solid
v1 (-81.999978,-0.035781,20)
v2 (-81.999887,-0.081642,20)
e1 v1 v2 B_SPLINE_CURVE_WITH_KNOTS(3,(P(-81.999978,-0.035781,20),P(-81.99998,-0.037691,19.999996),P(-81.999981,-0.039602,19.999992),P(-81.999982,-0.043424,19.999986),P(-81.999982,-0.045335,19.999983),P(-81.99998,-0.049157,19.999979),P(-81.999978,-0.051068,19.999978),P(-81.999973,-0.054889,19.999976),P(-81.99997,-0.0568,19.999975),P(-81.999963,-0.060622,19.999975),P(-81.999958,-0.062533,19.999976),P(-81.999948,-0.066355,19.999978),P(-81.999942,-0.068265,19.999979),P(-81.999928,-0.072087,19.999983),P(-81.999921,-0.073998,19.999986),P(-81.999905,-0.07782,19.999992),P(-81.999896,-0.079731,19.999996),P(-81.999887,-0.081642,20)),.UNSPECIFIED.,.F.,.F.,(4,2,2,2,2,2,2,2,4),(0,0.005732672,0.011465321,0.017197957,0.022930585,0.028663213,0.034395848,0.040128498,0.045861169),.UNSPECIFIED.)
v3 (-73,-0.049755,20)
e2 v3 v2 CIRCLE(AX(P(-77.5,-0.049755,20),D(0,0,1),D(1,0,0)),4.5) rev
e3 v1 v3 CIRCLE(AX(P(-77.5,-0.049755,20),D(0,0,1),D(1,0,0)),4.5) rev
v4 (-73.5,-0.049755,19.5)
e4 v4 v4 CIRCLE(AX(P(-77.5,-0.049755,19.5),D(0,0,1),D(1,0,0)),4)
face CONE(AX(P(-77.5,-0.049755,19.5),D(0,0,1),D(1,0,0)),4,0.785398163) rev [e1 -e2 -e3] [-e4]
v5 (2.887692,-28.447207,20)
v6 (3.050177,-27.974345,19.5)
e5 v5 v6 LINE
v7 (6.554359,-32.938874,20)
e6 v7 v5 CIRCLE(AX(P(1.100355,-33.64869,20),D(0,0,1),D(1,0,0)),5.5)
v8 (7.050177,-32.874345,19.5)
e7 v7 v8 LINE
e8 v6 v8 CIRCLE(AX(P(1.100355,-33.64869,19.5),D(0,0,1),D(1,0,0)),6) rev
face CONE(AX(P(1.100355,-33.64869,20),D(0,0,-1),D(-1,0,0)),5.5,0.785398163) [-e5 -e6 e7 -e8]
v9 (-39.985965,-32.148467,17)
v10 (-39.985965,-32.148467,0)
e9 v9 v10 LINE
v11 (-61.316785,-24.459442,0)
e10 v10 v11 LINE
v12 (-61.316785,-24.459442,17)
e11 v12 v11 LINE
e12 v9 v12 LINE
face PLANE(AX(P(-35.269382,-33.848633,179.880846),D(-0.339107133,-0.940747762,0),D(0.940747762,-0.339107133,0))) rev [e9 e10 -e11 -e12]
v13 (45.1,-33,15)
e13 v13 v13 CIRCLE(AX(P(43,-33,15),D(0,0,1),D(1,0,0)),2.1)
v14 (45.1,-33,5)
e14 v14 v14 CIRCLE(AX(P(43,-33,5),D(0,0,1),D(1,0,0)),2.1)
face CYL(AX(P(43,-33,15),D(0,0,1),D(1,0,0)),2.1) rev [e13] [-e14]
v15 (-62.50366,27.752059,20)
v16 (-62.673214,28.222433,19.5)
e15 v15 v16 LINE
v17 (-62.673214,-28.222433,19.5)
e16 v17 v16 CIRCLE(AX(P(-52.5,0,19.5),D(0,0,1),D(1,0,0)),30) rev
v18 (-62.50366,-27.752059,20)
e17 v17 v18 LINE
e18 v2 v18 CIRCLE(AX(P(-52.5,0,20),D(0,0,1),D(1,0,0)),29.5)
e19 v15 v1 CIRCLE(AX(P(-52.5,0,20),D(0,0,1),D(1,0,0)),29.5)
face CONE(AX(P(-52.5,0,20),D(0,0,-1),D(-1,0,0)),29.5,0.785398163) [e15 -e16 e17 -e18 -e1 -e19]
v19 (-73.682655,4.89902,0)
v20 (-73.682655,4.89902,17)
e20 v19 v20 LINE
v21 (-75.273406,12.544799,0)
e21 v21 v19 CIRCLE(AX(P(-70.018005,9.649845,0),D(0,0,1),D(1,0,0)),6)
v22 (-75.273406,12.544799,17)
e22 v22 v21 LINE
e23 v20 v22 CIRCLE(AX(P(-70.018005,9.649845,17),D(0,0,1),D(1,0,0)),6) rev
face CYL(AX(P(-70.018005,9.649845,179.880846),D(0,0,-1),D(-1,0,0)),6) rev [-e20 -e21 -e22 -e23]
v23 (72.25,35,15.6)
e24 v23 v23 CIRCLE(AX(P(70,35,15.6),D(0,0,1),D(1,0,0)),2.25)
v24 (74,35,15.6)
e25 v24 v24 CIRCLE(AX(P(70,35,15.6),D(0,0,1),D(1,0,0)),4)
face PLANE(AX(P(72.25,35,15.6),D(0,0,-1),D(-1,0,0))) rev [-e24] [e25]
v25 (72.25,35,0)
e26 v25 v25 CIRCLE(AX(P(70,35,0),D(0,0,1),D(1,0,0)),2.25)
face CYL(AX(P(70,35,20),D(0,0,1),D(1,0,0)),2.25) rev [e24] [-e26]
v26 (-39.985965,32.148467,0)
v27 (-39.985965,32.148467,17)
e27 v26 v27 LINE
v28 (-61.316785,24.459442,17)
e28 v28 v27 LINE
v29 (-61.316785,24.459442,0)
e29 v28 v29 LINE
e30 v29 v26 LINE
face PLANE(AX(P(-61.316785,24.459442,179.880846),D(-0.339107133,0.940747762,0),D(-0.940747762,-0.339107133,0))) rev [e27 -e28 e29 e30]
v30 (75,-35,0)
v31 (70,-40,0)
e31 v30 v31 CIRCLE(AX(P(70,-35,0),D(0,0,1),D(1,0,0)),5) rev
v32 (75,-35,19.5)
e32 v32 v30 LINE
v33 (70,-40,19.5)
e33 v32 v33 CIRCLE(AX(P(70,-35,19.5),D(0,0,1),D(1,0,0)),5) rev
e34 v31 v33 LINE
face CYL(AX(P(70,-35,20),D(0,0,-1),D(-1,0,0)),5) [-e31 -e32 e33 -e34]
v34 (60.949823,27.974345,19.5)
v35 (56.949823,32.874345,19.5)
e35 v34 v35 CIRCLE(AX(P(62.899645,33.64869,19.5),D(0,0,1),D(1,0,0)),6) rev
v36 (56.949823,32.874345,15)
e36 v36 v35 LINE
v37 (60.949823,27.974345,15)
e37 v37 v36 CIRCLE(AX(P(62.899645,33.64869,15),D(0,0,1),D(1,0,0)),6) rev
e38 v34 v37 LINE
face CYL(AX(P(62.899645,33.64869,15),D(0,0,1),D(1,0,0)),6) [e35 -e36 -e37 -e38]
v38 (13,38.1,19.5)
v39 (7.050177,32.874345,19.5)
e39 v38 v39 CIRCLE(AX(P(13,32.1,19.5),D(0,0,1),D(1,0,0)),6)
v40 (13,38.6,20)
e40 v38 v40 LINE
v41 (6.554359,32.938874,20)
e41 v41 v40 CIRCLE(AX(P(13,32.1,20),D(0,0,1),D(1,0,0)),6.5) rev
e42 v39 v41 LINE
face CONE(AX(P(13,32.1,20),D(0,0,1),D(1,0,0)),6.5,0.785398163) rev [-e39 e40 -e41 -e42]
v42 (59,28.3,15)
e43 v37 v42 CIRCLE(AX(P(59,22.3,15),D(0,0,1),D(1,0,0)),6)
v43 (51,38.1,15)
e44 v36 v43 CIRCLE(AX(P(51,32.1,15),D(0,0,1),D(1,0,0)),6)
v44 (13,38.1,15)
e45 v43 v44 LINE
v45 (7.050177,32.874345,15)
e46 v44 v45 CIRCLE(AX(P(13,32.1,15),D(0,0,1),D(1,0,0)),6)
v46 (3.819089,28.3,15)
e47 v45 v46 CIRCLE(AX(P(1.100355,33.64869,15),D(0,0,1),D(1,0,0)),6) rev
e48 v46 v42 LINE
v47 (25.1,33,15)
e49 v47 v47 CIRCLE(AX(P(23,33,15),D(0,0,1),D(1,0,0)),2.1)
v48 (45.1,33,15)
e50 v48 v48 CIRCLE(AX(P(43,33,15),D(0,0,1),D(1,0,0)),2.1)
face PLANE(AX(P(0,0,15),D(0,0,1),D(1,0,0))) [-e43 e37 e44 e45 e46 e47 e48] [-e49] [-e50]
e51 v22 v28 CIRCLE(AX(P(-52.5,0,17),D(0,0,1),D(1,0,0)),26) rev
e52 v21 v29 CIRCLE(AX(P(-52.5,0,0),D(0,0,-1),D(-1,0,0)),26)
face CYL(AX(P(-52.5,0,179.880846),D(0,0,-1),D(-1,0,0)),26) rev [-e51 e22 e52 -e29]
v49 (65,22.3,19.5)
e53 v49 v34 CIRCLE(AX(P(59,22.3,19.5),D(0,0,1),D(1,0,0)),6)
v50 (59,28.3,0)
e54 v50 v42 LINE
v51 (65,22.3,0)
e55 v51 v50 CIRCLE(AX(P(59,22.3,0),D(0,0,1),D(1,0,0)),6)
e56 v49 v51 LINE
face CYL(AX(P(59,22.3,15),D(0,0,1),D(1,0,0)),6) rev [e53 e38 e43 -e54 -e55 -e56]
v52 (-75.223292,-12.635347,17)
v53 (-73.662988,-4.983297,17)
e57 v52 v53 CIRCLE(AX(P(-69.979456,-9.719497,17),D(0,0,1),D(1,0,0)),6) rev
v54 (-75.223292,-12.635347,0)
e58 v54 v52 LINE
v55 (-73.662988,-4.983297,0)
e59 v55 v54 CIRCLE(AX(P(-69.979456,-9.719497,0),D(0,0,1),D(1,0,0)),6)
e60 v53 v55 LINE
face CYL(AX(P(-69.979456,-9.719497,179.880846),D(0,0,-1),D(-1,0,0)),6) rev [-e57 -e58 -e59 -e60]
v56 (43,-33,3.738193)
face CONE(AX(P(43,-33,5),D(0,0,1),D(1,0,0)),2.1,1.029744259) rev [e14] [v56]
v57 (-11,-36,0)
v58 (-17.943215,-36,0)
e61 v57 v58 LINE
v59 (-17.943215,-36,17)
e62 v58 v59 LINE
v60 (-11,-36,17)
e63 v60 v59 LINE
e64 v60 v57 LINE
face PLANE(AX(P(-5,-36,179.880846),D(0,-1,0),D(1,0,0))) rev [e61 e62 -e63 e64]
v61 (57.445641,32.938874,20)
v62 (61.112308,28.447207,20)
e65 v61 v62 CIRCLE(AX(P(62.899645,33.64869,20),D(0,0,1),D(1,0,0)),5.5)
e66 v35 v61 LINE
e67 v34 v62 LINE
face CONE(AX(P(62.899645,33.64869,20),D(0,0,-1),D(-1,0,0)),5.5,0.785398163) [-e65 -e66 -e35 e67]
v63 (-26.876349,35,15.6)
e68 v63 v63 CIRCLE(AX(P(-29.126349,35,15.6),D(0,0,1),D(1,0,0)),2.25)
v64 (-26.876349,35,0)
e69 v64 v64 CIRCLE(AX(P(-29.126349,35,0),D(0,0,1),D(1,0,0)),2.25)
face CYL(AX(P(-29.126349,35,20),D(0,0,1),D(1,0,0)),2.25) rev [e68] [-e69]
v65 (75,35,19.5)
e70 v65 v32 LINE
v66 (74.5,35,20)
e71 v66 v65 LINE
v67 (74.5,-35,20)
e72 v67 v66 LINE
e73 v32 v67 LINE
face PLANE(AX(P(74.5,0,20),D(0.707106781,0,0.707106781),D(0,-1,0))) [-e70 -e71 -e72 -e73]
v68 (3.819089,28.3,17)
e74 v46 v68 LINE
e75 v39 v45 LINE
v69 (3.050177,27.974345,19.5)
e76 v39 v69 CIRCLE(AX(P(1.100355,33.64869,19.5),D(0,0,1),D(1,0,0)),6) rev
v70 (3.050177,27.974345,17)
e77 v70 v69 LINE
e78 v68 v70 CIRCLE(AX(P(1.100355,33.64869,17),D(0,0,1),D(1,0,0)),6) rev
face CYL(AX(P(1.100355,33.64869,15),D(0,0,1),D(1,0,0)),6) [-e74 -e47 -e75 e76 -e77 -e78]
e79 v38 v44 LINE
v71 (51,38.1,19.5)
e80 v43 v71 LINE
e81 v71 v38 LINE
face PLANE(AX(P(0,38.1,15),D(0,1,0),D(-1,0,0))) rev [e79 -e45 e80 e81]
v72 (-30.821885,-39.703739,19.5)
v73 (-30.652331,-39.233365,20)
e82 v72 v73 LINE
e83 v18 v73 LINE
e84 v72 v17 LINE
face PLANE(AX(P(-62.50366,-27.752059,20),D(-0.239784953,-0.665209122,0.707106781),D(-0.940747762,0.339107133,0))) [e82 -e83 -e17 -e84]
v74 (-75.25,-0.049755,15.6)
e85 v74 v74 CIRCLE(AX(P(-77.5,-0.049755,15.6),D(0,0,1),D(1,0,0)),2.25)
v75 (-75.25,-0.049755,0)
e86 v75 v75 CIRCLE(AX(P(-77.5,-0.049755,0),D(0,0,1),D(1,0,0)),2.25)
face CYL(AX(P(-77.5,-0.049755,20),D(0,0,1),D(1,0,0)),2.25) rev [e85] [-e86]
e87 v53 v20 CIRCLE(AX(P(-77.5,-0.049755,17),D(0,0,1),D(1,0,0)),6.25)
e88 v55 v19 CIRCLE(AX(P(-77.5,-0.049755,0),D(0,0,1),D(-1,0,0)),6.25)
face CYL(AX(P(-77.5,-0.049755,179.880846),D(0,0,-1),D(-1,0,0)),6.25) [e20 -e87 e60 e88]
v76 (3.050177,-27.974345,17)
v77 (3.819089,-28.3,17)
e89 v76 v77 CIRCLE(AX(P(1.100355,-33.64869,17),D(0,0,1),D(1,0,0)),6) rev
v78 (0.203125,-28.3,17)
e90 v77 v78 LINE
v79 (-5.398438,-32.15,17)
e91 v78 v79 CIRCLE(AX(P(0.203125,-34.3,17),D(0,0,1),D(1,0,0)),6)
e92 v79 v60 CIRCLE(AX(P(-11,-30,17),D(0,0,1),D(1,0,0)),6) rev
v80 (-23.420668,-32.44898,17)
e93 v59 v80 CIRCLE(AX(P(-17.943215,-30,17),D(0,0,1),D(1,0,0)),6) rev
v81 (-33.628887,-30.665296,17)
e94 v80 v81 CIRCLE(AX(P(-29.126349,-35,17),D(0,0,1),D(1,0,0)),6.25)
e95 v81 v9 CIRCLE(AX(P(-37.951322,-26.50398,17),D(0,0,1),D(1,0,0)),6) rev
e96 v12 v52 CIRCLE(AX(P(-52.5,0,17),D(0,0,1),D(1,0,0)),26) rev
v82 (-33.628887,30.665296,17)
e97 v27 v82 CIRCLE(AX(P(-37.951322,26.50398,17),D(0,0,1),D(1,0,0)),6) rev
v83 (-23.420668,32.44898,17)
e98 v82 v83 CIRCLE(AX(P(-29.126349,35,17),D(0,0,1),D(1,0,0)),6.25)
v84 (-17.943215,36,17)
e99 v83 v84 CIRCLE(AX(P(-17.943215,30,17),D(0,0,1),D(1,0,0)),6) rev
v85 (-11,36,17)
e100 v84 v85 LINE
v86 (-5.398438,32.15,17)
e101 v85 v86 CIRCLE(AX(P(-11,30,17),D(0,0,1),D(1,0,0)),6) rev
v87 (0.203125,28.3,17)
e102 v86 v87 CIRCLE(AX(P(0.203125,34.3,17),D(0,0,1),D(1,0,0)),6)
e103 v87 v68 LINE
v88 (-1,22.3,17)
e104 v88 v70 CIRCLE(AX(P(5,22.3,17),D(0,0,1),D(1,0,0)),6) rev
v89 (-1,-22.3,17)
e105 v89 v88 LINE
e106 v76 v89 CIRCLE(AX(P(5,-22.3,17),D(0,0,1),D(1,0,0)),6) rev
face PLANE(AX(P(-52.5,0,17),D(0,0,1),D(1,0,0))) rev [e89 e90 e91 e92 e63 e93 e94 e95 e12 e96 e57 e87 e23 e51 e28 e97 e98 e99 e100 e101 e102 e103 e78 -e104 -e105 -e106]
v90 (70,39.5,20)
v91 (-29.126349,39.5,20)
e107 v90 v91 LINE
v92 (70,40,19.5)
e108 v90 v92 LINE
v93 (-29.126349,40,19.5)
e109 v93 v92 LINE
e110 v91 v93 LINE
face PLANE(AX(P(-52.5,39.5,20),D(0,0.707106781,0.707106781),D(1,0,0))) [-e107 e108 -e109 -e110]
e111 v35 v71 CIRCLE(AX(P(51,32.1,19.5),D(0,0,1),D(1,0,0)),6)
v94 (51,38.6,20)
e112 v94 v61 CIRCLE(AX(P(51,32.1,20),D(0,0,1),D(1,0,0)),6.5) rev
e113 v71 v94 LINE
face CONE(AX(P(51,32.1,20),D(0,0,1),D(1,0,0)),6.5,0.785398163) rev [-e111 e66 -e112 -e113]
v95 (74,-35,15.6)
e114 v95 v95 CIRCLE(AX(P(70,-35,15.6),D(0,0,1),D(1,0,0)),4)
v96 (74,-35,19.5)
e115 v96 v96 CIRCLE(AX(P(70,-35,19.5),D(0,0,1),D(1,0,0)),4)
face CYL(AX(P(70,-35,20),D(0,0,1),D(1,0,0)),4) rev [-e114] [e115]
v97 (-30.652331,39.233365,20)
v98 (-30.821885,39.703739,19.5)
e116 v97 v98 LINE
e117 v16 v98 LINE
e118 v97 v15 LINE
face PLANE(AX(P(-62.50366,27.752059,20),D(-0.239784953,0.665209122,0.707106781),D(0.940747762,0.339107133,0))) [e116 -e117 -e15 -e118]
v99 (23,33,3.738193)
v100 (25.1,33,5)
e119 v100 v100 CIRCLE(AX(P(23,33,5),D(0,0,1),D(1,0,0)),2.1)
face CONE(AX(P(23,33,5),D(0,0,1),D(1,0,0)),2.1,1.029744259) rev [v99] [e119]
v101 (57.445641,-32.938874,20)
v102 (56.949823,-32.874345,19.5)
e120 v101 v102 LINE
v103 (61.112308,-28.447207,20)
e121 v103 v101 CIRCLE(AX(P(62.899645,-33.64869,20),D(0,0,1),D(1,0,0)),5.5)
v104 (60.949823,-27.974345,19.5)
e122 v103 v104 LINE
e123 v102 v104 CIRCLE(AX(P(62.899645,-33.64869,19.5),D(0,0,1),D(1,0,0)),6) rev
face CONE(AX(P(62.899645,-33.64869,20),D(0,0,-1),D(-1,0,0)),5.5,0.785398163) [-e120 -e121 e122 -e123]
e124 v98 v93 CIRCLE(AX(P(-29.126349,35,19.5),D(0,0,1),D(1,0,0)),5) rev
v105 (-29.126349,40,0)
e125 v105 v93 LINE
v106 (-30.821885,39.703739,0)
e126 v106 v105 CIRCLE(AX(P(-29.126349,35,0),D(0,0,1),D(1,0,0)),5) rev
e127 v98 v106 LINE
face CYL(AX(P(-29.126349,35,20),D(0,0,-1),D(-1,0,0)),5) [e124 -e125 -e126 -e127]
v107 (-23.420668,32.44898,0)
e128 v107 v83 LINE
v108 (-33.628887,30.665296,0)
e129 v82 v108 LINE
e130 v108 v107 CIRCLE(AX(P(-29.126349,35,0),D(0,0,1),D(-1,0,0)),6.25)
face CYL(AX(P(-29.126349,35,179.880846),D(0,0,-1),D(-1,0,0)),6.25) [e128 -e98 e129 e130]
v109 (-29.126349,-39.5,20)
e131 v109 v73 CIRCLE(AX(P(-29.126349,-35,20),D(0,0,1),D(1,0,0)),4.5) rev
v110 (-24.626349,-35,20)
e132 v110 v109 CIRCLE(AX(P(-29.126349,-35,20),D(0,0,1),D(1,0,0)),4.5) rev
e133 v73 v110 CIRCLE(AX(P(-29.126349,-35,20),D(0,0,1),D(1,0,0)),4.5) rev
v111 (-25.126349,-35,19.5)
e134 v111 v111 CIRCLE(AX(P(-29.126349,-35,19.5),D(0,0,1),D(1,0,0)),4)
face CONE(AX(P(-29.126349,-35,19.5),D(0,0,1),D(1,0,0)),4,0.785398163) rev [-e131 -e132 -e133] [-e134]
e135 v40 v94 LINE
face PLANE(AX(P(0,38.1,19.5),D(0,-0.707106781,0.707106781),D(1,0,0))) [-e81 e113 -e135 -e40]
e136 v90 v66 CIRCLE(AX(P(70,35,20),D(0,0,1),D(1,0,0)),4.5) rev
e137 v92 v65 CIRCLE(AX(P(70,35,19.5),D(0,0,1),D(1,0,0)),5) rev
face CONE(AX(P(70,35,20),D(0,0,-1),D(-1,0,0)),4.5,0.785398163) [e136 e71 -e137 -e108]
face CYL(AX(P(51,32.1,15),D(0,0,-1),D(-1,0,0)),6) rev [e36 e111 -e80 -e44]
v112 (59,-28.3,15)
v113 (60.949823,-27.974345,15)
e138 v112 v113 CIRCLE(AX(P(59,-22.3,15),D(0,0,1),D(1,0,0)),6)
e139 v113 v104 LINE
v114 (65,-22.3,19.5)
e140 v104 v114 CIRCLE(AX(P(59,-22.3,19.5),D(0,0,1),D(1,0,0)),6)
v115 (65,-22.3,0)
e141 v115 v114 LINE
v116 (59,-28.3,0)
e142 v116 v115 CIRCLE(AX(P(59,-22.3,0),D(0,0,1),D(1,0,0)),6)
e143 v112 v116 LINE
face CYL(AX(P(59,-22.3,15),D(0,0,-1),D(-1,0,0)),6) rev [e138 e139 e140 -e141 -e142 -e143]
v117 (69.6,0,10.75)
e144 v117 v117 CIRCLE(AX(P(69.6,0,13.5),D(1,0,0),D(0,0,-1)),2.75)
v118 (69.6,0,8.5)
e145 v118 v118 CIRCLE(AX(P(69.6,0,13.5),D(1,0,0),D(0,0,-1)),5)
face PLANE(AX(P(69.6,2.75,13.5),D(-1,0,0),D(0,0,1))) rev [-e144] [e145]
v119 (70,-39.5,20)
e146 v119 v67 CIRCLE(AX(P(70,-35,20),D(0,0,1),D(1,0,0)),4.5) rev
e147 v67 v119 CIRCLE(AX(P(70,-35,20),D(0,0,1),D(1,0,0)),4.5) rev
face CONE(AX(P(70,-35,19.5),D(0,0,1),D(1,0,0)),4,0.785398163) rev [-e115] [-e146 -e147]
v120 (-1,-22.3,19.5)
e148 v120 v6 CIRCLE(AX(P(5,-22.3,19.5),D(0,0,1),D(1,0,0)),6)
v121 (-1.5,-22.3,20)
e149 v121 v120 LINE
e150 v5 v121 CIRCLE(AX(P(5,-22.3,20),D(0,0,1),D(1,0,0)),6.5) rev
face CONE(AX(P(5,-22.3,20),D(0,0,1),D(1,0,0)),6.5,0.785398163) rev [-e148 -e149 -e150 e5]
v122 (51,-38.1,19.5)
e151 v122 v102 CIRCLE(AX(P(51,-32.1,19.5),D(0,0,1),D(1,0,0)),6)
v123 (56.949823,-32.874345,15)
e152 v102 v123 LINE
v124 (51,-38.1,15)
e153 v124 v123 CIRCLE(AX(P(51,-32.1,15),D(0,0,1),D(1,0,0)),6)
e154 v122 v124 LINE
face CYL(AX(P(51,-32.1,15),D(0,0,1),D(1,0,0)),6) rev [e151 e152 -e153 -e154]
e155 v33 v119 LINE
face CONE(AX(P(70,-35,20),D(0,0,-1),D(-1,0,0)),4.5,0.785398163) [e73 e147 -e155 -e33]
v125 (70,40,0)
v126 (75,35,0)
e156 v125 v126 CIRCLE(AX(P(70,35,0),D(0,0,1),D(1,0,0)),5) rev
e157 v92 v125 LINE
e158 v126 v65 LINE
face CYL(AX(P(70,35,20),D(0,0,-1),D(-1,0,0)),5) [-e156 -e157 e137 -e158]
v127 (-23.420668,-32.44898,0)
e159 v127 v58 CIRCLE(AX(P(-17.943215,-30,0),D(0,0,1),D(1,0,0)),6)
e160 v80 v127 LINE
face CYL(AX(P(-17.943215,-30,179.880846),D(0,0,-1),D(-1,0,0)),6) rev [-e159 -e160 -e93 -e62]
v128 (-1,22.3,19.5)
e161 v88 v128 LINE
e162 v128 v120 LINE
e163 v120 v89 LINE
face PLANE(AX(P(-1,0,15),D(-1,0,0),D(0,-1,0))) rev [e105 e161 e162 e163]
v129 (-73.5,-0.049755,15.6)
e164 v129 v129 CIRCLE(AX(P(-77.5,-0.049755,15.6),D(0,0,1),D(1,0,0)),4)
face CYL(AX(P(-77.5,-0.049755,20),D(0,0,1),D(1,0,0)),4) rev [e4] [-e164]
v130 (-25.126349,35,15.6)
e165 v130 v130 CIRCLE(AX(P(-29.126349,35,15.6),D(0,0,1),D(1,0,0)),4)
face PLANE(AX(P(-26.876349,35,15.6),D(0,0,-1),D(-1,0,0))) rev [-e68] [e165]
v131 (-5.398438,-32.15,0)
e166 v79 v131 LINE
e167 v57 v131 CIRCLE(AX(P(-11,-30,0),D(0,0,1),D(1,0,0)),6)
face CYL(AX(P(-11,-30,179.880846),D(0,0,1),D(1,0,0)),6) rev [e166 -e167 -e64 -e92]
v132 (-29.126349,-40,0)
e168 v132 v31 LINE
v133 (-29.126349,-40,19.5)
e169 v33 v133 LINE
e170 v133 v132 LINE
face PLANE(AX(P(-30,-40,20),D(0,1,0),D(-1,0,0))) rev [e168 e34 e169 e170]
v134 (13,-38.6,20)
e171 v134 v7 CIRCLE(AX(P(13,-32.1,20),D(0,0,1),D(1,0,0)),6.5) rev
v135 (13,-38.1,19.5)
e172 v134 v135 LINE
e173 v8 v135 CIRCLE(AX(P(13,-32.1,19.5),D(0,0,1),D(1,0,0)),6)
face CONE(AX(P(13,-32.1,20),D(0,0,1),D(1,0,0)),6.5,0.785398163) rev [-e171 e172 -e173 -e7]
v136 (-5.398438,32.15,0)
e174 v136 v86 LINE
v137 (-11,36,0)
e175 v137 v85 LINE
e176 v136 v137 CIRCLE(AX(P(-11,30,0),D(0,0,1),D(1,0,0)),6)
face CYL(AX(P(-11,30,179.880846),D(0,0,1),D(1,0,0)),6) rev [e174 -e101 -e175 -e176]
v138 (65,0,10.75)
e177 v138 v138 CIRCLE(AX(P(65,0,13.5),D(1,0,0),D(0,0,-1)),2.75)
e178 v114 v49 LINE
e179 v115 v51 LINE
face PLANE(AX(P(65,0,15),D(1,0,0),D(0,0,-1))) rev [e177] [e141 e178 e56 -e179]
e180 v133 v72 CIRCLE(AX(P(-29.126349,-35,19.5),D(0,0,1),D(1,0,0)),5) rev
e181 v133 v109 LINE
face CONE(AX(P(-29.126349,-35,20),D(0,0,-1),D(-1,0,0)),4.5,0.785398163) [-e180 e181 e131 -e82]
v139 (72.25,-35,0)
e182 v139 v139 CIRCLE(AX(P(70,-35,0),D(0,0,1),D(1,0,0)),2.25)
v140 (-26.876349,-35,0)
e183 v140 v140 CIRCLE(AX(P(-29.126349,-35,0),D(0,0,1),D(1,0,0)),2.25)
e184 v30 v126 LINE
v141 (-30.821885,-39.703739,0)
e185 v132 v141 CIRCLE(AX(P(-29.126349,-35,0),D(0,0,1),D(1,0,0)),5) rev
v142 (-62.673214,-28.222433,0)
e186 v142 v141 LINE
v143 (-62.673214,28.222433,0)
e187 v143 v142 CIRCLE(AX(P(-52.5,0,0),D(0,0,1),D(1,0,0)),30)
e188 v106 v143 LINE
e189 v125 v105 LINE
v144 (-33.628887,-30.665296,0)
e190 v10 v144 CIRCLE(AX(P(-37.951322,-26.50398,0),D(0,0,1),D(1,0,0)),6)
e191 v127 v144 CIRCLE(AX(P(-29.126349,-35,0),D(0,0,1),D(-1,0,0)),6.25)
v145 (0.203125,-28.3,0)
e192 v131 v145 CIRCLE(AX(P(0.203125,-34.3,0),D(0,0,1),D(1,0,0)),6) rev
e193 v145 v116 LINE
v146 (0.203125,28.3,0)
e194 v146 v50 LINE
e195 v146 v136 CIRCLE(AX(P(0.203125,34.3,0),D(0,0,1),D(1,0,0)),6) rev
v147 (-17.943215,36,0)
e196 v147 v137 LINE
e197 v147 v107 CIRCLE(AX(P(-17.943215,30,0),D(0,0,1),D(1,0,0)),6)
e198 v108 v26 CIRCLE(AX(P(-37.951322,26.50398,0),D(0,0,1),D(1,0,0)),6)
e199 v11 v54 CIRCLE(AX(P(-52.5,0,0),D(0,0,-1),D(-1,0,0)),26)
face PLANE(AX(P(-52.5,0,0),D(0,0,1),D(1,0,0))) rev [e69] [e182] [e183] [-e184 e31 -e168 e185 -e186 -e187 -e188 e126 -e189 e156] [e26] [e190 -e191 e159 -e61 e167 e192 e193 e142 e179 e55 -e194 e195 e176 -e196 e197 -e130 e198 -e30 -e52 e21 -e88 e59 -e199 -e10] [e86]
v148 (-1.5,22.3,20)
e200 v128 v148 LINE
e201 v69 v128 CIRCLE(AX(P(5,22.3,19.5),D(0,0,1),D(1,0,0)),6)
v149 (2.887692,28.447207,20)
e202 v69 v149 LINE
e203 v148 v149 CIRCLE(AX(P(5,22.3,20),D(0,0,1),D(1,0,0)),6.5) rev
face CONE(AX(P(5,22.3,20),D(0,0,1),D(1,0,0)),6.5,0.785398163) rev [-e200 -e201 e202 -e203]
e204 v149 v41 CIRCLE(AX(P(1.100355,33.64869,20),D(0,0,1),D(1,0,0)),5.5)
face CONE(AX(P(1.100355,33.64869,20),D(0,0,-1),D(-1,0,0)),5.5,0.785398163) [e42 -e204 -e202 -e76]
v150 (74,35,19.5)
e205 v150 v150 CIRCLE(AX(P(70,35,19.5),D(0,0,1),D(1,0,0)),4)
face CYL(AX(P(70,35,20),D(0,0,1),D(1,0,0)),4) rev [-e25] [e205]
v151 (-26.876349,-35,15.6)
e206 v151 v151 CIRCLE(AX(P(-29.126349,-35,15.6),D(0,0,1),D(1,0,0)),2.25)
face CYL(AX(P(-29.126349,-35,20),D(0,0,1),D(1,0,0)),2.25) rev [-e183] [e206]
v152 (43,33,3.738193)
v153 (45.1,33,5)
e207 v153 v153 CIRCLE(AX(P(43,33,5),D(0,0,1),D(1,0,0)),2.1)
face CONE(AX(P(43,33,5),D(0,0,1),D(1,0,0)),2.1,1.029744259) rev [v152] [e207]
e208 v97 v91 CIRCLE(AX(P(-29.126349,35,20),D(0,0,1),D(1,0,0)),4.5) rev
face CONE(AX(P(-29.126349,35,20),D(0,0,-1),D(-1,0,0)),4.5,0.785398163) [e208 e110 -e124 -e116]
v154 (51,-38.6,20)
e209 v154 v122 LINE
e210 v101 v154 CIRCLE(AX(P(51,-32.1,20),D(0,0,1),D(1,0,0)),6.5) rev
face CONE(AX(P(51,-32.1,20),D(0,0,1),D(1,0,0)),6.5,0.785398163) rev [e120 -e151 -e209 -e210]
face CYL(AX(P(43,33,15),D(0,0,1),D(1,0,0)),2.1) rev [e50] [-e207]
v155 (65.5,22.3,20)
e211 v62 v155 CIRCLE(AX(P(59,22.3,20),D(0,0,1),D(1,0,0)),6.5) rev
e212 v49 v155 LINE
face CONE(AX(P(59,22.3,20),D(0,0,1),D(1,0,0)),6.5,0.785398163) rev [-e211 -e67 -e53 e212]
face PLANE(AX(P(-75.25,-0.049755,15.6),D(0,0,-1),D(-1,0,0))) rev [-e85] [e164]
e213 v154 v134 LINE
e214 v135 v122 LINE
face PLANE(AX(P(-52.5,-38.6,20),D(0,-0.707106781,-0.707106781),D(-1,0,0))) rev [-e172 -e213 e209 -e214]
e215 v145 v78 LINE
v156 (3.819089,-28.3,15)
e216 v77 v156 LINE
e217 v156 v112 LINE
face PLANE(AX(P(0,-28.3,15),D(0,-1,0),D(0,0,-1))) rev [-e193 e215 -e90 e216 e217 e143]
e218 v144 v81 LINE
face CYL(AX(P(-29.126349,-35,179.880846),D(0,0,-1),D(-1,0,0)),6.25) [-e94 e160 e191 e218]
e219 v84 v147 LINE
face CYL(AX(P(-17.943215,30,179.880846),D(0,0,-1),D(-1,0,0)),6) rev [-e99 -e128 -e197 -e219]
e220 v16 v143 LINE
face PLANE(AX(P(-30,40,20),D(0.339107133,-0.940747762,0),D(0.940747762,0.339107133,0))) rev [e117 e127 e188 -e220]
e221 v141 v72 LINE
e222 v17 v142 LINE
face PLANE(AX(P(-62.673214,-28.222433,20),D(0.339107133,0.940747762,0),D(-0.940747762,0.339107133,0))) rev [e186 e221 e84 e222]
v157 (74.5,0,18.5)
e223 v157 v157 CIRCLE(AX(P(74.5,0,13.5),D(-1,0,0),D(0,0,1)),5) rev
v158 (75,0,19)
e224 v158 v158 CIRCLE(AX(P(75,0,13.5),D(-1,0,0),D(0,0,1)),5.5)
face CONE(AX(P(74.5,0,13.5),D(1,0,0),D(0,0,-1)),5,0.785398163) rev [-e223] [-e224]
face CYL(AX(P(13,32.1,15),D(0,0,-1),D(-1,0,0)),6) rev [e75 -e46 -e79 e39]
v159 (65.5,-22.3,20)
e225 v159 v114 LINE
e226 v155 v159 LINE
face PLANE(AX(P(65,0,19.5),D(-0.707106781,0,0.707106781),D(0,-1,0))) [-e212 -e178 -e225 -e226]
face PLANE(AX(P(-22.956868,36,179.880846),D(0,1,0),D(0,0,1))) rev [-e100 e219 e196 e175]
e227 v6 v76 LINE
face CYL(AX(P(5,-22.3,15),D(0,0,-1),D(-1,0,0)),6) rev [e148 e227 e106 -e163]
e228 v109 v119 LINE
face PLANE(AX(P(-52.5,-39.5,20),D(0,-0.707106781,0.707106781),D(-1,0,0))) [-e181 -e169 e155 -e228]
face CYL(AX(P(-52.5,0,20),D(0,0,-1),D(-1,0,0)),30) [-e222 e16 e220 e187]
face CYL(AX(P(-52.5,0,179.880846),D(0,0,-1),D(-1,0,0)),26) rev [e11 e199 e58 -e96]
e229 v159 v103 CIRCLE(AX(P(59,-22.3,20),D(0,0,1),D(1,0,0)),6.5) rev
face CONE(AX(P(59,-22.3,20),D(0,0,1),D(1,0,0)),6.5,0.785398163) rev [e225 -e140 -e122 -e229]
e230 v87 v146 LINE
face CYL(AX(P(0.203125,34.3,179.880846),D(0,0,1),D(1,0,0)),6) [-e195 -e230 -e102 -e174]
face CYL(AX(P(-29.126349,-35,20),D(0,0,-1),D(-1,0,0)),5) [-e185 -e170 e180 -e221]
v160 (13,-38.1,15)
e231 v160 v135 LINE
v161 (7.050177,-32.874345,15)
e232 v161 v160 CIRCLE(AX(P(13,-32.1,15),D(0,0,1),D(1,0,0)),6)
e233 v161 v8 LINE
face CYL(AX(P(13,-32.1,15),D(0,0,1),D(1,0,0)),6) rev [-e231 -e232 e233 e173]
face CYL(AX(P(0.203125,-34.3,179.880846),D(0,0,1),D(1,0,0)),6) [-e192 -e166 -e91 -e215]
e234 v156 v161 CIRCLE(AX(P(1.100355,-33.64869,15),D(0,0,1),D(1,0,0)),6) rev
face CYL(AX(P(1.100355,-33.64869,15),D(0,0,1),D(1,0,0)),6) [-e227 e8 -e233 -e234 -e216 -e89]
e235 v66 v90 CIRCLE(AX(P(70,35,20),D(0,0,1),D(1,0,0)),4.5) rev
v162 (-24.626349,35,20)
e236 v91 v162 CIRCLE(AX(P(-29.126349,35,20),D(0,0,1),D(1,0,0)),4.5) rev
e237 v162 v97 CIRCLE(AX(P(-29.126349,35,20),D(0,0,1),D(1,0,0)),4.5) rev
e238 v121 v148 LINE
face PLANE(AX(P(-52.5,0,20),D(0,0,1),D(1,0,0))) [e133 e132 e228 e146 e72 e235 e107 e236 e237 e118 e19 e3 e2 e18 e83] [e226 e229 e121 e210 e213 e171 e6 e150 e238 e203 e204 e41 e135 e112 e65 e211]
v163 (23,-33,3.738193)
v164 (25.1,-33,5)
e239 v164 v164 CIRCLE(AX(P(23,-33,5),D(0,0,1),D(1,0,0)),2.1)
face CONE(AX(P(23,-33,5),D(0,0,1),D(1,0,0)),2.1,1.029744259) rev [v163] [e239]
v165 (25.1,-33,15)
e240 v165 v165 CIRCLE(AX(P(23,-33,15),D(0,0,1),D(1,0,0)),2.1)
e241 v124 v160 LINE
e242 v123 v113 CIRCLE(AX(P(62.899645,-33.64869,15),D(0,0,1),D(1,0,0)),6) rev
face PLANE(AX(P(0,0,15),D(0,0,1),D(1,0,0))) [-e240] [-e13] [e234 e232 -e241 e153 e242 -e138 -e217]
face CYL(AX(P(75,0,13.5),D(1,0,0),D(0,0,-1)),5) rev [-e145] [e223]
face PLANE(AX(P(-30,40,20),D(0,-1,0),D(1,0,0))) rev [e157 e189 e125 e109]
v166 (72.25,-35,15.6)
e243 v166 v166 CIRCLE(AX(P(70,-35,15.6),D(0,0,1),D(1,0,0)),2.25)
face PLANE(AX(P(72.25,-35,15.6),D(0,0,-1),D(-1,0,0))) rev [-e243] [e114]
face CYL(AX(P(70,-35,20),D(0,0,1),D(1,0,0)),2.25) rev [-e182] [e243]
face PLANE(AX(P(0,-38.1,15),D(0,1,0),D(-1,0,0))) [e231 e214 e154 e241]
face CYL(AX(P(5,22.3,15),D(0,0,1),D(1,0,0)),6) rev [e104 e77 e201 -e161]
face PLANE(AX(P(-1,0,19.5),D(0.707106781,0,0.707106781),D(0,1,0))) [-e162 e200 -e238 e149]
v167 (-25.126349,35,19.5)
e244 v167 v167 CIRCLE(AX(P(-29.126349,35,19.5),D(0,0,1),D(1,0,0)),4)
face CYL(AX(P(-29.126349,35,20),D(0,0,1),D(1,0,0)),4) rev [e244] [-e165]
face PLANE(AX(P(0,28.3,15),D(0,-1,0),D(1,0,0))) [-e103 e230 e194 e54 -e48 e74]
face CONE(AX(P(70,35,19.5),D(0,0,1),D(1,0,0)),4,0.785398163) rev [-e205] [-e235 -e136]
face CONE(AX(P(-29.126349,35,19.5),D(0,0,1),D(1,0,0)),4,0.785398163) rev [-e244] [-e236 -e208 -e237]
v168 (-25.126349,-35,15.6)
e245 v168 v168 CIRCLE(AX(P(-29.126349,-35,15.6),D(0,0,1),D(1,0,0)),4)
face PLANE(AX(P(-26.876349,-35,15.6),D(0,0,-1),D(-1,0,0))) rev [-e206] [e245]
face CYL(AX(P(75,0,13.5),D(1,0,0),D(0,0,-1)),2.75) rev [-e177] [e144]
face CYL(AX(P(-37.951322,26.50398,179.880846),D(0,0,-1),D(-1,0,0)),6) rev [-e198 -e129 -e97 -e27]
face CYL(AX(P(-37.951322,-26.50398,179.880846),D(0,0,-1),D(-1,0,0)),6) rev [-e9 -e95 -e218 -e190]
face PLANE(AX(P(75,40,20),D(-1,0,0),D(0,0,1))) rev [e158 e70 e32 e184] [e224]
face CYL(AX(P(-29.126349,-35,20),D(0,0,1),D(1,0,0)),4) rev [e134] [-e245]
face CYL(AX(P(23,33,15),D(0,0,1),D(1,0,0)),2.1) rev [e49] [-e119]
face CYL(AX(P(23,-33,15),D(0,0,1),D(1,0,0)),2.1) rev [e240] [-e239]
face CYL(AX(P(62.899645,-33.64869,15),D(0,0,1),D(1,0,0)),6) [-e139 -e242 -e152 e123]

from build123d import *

# Parameters (mm, degrees)
BOSS_EXTRUDE1_DEPTH                                 = 20
FILLET1_R                                           = 5
CBORE_FOR_M4_HEX_SOCKET_HEAD_CAP_SCREW1_D           = 4.5
CBORE_FOR_M4_HEX_SOCKET_HEAD_CAP_SCREW1_CBORE_D     = 8
CBORE_FOR_M4_HEX_SOCKET_HEAD_CAP_SCREW1_CBORE_DEPTH = 4.4
CUT_EXTRUDE3_DEPTH                                  = 5
CUT_EXTRUDE4_DEPTH                                  = 94.841621896
FILLET4_R                                           = 6
FILLET5_R                                           = 6
CUT_EXTRUDE1_DEPTH                                  = 17
FILLET2_R                                           = 6
FILLET6_R                                           = 6
TAP_DRILL_FOR_M5_TAP1_D                             = 4.2
TAP_DRILL_FOR_M5_TAP1_DEPTH                         = 10
TAP_DRILL_FOR_M5_TAP1_TIP                           = 1.2618073
CBORE_FOR_M5_HEX_SOCKET_HEAD_CAP_SCREW2_D           = 5.5
CBORE_FOR_M5_HEX_SOCKET_HEAD_CAP_SCREW2_DEPTH       = 20
CBORE_FOR_M5_HEX_SOCKET_HEAD_CAP_SCREW2_CBORE_D     = 10
CBORE_FOR_M5_HEX_SOCKET_HEAD_CAP_SCREW2_CBORE_DEPTH = 5.4
CBORE_FOR_M5_HEX_SOCKET_HEAD_CAP_SCREW2_TIP         = 1.652366702
CHAMFER1_SIZE                                       = 0.5


# Some blends are built 0.0001 mm under size
with BuildPart() as part:
    # Sketch2 → Boss-Extrude1 (new body)
    with BuildSketch(Plane.XY):
        with BuildLine():
            Line((-30, 40), (75, 40))
            Line((75, 40), (75, -40))
            Line((75, -40), (-30, -40))
            Line((-30, -40), (-62.673213991, -28.22243287))
            ThreePointArc((-62.673213991, -28.22243287), (-82.5, 0), (-62.673213991, 28.22243287))
            Line((-62.673213991, 28.22243287), (-30, 40))
        make_face()
    extrude(amount=BOSS_EXTRUDE1_DEPTH)

    # Fillet1
    fillet1_edges = [part.edges().sort_by_distance(p)[0] for p in [
        (-30, -40, 10),
        (-30, 40, 10),
        (75, 40, 10),
        (75, -40, 10),
    ]]
    fillet(fillet1_edges, radius=FILLET1_R)

    # CBORE for M4 Hex Socket Head Cap Screw1 (through all)
    with Locations(Plane(origin=(-29.126349288, 35, 20), x_dir=(1, 0, 0), z_dir=(0, 0, 1))):
        with Locations((0, 0), (0, -70), (99.126349288, 0), (99.126349288, -70), (-48.373650712, -35.049755237)):
            CounterBoreHole(CBORE_FOR_M4_HEX_SOCKET_HEAD_CAP_SCREW1_D / 2, CBORE_FOR_M4_HEX_SOCKET_HEAD_CAP_SCREW1_CBORE_D / 2, CBORE_FOR_M4_HEX_SOCKET_HEAD_CAP_SCREW1_CBORE_DEPTH)

    # Sketch10 → Cut-Extrude3 (cut)
    with BuildSketch(Plane.XY.offset(20)):
        Polygon((7, -28.3), (65, -28.3), (65, 28.3), (7, 28.3), (-1, 28.3), (-1, -28.3), align=None)
        Polygon((57, -38.1), (15, -38.1), (7, -38.1), (7, 38.1), (15, 38.1), (57, 38.1), align=None)
    extrude(amount=-CUT_EXTRUDE3_DEPTH, mode=Mode.SUBTRACT)

    # Sketch10<4> → Cut-Extrude4 (cut, through all)
    with BuildSketch(Plane.XY.offset(20)):
        Polygon((7, -28.3), (65, -28.3), (65, 28.3), (7, 28.3), (-1, 28.3), (-1, -28.3), align=None)
    extrude(amount=-CUT_EXTRUDE4_DEPTH, mode=Mode.SUBTRACT)

    # Fillet4
    fillet4_edges = [part.edges().sort_by_distance(p)[0] for p in [
        (65, 28.3, 10),
        (65, -28.3, 10),
        (57, -38.1, 17.5),
        (7, -38.1, 17.5),
        (-1, -28.3, 10),
        (-1, 28.3, 10),
        (7, 38.1, 17.5),
        (57, 38.1, 17.5),
    ]]
    fillet(fillet4_edges, radius=FILLET4_R)

    # Fillet5
    # the kernel refuses this fillet: 6 mm, written as the material it takes off along each edge
    with BuildSketch(Plane(origin=(7, 28.3, 31.436550577), x_dir=(-0.9966183944804063, -0.08216918998807972, 0), z_dir=(0, 0, -1)), Plane(origin=(57, 28.3, 15), x_dir=(0.9966183944804067, -0.08216918998807658, 0), z_dir=(0, 0, 1)), Plane(origin=(57, -28.3, 31.436550577), x_dir=(0.9966183944804065, 0.0821691899880794, 0), z_dir=(0, 0, -1)), Plane(origin=(7, -28.3, 15), x_dir=(-0.9966183944804063, 0.08216918998808052, 0), z_dir=(0, 0, 1))) as fillet5_piece_1:
        with BuildLine():
            CenterArc((5.44019753, 5.815371987), FILLET5_R, 192.12839437, 63.621083031)
            Line((-0.425877879, 4.554753373), (-1.01248542, 4.428691512))
            ThreePointArc((-1.01248542, 4.428691512), (-0.910213959, 3.737848385), (-0.597971037, -0.049301514))
            Line((-0.597971037, -0.049301514), (0.049301514, -0.597971037))
            ThreePointArc((0.049301514, -0.597971037), (2.042538303, -0.433632657), (3.815527449, -0.581537199))
            Line((3.815527449, -0.581537199), (3.96322473, 0))
        make_face()
    extrude(amount=16.436550577, mode=Mode.SUBTRACT)

    # Sketch8 → Cut-Extrude1 (cut)
    with BuildSketch(Plane(origin=(0, 0, 0), x_dir=(-1, 0, 0), z_dir=(0, 0, -1))):
        with BuildLine():
            Line((-59, 28.3), (5, 28.3))
            Line((5, 28.3), (5, 36))
            Line((5, 36), (22.956867948, 36))
            ThreePointArc((22.956867948, 36), (28.050584319, 28.843277679), (35.269382186, 33.848632633))
            Line((35.269382186, 33.848632633), (61.316785459, 24.459441821))
            ThreePointArc((61.316785459, 24.459441821), (71.827476782, 17.391050607), (77.751129252, 6.195197453))
            ThreePointArc((77.751129252, 6.195197453), (71.250012378, -0.037316452), (77.726269833, -6.295658051))
            ThreePointArc((77.726269833, -6.295658051), (71.79282674, -17.429481816), (61.316785459, -24.459441821))
            Line((61.316785459, -24.459441821), (35.269382186, -33.848632633))
            ThreePointArc((35.269382186, -33.848632633), (28.050584319, -28.843277679), (22.956867948, -36))
            Line((22.956867948, -36), (5, -36))
            Line((5, -36), (5, -28.3))
            Line((5, -28.3), (-59, -28.3))
            ThreePointArc((-59, -28.3), (-63.242640687, -26.542640687), (-65, -22.3))
            Line((-65, -22.3), (-65, 22.3))
            ThreePointArc((-65, 22.3), (-63.242640687, 26.542640687), (-59, 28.3))
        make_face()
    extrude(amount=-CUT_EXTRUDE1_DEPTH, mode=Mode.SUBTRACT)

    # Fillet2
    fillet2_edges = [part.edges().sort_by_distance(p)[0] for p in [
        (-35.269382186, 33.848632633, 8.5),
        (-22.956867948, 36, 8.5),
        (-5, 36, 8.5),
        (-5, -36, 8.5),
        (-22.956867948, -36, 8.5),
        (-35.269382186, -33.848632633, 8.5),
        (-77.726269833, -6.295658051, 8.5),
        (-77.751129252, 6.195197453, 8.5),
    ]]
    fillet(fillet2_edges, radius=FILLET2_R)

    # Fillet6
    fillet6_edges = [part.edges().sort_by_distance(p)[0] for p in [
        (-5, -28.3, 8.5),
        (-5, 28.3, 8.5),
    ]]
    fillet(fillet6_edges, radius=FILLET6_R)

    # Tap Drill for M5 Tap1
    with Locations(Plane.XY.offset(15)):
        with Locations((43, -33), (33, 0), (43, 33), (23, -33), (23, 33)):
            Hole(TAP_DRILL_FOR_M5_TAP1_D / 2, depth=TAP_DRILL_FOR_M5_TAP1_DEPTH)
            with Locations((0, 0, -(TAP_DRILL_FOR_M5_TAP1_DEPTH + TAP_DRILL_FOR_M5_TAP1_TIP / 2))):  # 118° drill point
                Cone(0, TAP_DRILL_FOR_M5_TAP1_D / 2, TAP_DRILL_FOR_M5_TAP1_TIP, mode=Mode.SUBTRACT)

    # CBORE for M5 Hex Socket Head Cap Screw2
    with Locations(Plane(origin=(75, 0, 0), x_dir=(0, 0, -1), z_dir=(1, 0, 0))):
        with Locations((-13.5, 0)):
            CounterBoreHole(CBORE_FOR_M5_HEX_SOCKET_HEAD_CAP_SCREW2_D / 2, CBORE_FOR_M5_HEX_SOCKET_HEAD_CAP_SCREW2_CBORE_D / 2, CBORE_FOR_M5_HEX_SOCKET_HEAD_CAP_SCREW2_CBORE_DEPTH, depth=CBORE_FOR_M5_HEX_SOCKET_HEAD_CAP_SCREW2_DEPTH)
            with Locations((0, 0, -(CBORE_FOR_M5_HEX_SOCKET_HEAD_CAP_SCREW2_DEPTH + CBORE_FOR_M5_HEX_SOCKET_HEAD_CAP_SCREW2_TIP / 2))):  # 118° drill point
                Cone(0, CBORE_FOR_M5_HEX_SOCKET_HEAD_CAP_SCREW2_D / 2, CBORE_FOR_M5_HEX_SOCKET_HEAD_CAP_SCREW2_TIP, mode=Mode.SUBTRACT)

    # Chamfer1
    chamfer1_edges = [part.edges().sort_by_distance(p)[0] for p in [
        (65, 0, 20),
        (32, -38.1, 20),
        (-82.5, 0, 20),
        (-1, 0, 20),
        (32, 38.1, 20),
        (63.883591711, -25.785761323, 20),
        (9.040585283, -36.608107708, 20),
        (0.116408289, 25.785761323, 20),
        (54.959414717, 36.608107708, 20),
        (-46.747549472, 33.963085841, 20),
        (-46.747549472, -33.963085841, 20),
        (63.883591711, 25.785761323, 20),
        (54.959414717, -36.608107708, 20),
        (0.116408289, -25.785761323, 20),
        (9.040585283, 36.608107708, 20),
        (5.748321867, -29.854431129, 20),
        (58.251678133, -29.854431129, 20),
        (58.251678133, 29.854431129, 20),
        (5.748321867, 29.854431129, 20),
        (20.436825356, 40, 20),
        (20.436825356, -40, 20),
        (75, 0, 20),
        (-29.986961262, -39.925377856, 20),
        (73.535533906, -38.535533906, 20),
        (73.535533906, 38.535533906, 20),
        (-29.986961262, 39.925377856, 20),
        (75, 0, 18.5),
        (-81.5, -0.049755237, 20),
        (66, -35, 20),
        (66, 35, 20),
        (-33.126349288, -35, 20),
        (-33.126349288, 35, 20),
    ]]
    chamfer(chamfer1_edges, length=CHAMFER1_SIZE - 0.0001)  # a hair under: the kernel refuses the full size


solid = part.part
